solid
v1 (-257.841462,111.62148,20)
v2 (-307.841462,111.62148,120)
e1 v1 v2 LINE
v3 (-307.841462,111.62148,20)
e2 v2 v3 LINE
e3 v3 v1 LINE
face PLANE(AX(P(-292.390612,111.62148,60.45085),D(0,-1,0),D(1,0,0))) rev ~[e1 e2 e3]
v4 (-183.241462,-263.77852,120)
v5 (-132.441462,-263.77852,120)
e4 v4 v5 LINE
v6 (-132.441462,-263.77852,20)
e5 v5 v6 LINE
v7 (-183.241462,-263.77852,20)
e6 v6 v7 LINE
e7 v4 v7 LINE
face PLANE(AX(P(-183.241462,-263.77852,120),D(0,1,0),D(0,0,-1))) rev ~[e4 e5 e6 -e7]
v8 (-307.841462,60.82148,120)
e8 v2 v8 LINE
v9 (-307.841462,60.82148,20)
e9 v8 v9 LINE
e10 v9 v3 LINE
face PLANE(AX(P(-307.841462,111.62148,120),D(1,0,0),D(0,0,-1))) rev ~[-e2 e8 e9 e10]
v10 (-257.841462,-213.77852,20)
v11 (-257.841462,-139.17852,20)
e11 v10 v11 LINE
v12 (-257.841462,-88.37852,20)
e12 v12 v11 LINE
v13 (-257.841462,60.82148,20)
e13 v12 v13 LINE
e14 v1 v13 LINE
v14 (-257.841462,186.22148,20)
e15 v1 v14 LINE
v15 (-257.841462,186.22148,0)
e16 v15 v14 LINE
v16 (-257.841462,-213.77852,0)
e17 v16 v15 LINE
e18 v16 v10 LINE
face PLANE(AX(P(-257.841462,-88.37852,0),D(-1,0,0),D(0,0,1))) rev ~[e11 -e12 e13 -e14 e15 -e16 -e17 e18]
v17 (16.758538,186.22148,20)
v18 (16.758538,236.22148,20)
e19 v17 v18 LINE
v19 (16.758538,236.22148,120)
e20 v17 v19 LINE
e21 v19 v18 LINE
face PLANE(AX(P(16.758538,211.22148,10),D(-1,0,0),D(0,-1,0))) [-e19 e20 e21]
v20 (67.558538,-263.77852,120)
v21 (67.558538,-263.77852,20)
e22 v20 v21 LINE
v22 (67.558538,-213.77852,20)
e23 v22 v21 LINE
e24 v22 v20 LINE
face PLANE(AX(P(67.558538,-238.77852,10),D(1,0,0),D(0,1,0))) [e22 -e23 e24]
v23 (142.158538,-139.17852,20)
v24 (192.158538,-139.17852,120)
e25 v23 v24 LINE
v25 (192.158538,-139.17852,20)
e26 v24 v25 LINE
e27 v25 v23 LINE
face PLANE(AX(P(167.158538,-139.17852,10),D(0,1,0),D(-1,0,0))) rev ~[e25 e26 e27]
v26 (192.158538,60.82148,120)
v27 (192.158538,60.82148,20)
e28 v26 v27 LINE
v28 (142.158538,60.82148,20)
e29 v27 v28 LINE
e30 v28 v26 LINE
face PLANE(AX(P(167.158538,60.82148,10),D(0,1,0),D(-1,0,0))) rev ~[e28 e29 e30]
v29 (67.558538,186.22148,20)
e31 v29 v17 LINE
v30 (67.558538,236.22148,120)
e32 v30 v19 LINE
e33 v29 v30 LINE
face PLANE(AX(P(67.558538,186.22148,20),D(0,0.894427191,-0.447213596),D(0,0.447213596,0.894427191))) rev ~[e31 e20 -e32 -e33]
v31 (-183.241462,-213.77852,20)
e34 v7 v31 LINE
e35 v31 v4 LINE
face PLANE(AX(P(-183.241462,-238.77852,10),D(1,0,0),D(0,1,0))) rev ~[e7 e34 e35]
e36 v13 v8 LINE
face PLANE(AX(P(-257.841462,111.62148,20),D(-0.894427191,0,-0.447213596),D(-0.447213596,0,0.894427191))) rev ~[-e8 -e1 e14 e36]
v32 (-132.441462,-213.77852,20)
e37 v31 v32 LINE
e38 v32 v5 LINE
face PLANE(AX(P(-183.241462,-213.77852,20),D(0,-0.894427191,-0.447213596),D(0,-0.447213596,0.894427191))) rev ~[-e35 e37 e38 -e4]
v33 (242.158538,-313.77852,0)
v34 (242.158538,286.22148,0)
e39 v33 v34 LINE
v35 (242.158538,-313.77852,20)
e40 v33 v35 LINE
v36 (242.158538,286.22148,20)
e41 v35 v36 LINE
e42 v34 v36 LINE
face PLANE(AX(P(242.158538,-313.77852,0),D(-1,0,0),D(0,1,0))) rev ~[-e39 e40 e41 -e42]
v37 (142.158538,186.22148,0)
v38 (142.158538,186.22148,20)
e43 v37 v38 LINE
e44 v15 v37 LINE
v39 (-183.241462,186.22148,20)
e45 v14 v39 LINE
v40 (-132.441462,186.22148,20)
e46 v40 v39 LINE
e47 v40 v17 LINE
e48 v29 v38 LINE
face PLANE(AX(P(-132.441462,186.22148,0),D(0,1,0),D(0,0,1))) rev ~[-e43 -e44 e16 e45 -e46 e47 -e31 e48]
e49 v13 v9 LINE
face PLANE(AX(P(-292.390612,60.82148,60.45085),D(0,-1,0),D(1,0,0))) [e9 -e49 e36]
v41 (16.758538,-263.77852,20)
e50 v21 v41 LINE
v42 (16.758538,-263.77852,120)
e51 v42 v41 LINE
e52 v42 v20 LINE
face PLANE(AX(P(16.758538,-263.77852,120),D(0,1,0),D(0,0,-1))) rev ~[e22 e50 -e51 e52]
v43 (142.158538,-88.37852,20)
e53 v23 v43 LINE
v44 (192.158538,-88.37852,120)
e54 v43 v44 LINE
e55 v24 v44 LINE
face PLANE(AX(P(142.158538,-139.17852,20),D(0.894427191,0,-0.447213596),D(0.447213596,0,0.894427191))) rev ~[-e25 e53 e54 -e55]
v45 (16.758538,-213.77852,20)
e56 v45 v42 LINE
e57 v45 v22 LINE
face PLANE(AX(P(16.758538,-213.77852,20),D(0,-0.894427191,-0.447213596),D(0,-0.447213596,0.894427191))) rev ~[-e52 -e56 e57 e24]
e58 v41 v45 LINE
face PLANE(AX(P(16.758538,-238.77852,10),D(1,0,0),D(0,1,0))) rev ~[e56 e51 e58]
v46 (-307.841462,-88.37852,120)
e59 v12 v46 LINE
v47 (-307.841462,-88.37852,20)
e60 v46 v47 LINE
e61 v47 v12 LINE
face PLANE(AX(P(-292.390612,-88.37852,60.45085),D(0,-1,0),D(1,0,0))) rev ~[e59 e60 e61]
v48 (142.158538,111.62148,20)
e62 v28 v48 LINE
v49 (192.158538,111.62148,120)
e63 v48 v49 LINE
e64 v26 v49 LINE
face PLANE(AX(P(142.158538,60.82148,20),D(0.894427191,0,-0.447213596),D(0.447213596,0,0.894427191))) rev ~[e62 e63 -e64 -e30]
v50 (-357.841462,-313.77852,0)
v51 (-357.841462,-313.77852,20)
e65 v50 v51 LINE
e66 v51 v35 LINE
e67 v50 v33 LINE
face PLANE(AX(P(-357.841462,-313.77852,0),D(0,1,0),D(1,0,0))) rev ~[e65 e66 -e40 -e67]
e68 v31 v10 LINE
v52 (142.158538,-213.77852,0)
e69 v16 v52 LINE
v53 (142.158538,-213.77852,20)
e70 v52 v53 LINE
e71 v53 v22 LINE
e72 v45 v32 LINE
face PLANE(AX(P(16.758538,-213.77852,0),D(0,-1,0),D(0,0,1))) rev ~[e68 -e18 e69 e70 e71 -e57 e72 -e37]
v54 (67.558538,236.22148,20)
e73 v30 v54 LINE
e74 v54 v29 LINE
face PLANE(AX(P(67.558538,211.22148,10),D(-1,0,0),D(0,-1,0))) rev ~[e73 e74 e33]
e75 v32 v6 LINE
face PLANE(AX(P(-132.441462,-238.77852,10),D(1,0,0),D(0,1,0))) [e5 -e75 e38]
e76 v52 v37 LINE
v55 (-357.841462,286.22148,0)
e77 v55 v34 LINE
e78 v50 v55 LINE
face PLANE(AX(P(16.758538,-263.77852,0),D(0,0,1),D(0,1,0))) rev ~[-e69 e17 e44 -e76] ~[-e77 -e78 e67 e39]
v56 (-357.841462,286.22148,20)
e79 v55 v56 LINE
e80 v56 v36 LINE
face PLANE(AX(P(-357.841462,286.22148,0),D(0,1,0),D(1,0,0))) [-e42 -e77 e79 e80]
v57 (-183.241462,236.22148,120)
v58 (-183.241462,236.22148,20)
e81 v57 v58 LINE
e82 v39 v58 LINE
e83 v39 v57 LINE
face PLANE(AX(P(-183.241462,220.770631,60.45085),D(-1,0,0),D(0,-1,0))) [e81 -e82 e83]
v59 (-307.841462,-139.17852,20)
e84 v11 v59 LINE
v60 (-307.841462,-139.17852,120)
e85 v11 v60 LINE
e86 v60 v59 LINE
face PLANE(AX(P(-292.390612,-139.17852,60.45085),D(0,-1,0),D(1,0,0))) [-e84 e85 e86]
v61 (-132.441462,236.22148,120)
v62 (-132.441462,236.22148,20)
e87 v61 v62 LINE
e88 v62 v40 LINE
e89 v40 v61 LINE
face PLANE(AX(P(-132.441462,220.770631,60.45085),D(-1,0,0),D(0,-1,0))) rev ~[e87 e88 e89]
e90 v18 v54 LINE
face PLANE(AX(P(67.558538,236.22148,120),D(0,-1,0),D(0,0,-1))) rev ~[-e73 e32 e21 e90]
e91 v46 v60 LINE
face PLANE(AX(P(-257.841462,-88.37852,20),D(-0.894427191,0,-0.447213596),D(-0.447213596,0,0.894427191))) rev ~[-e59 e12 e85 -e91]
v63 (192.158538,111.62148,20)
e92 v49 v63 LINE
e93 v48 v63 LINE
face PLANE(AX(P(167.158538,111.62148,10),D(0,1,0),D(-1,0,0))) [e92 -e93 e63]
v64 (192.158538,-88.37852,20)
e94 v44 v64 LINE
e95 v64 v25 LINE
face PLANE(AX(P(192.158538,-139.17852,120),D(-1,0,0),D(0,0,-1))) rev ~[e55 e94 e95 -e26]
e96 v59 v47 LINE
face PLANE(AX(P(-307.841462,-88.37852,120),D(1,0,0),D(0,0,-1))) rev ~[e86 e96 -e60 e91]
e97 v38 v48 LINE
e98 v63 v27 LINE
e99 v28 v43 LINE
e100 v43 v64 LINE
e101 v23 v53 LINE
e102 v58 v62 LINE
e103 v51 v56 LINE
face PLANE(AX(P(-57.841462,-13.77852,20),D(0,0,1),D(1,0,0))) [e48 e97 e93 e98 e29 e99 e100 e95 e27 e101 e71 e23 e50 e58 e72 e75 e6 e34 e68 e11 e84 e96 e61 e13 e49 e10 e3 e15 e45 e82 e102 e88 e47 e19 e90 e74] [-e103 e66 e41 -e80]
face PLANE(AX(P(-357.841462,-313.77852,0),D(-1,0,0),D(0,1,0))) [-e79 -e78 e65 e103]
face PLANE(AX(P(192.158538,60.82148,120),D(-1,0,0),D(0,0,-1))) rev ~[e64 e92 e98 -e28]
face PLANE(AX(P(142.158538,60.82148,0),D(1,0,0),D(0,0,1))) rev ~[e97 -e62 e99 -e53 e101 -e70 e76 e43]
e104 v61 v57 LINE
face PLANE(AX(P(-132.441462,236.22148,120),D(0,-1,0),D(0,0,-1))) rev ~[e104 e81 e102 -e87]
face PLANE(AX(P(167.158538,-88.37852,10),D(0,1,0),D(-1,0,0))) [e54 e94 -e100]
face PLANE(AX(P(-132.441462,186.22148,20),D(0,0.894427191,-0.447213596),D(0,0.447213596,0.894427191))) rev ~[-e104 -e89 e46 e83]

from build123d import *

# Parameters (mm, degrees)
F0_W      = 600
F0_H      = 600
F1_DEPTH  = 20
F2_W      = 50
F2_H      = 20
F3_W      = 50
F3_H      = 20
F8_DEPTH  = 50.8
F4_W      = 50
F4_H      = 20
F5_W      = 50
F5_H      = 20
F11_DEPTH = 50.8
F6_W      = 50
F6_H      = 20
F7_W      = 50
F7_H      = 20
F12_DEPTH = 50.8
F9_W      = 50
F9_H      = 20
F10_W     = 50
F10_H     = 20
F13_DEPTH = 50.8


# Not quite as in the source:
# - a feature names something its author has since deleted; it is built from what else it names


with BuildPart() as f1:
    # F0 (on Top) → F1 (new body)
    with BuildSketch(Plane.XY):
        with Locations((-57.8414618969, -13.7785196304)):
            Rectangle(F0_W, F0_H)
        Polygon((-257.8414618969, 111.6214803696), (-257.8414618969, 186.2214803696), (-183.2414618969, 186.2214803696), (-183.2414618969, 236.2214803696), (-157.8414618969, 236.2214803696), (-132.4414618969, 236.2214803696), (-132.4414618969, 186.2214803696), (16.7585381031, 186.2214803696), (16.7585381031, 236.2214803696), (67.5585381031, 236.2214803696), (67.5585381031, 186.2214803696), (142.1585381031, 186.2214803696), (142.1585381031, 111.6214803696), (192.1585381031, 111.6214803696), (192.1585381031, 60.8214803696), (142.1585381031, 60.8214803696), (142.1585381031, -88.3785196304), (192.1585381031, -88.3785196304), (192.1585381031, -139.1785196304), (142.1585381031, -139.1785196304), (142.1585381031, -213.7785196304), (67.5585381031, -213.7785196304), (67.5585381031, -263.7785196304), (16.7585381031, -263.7785196304), (16.7585381031, -213.7785196304), (-132.4414618969, -213.7785196304), (-132.4414618969, -263.7785196304), (-183.2414618969, -263.7785196304), (-183.2414618969, -213.7785196304), (-257.8414618969, -213.7785196304), (-257.8414618969, -139.1785196304), (-307.8414618969, -139.1785196304), (-307.8414618969, -88.3785196304), (-257.8414618969, -88.3785196304), (-257.8414618969, -13.7785196304), (-257.8414618969, 60.8214803696), (-307.8414618969, 60.8214803696), (-307.8414618969, 111.6214803696), align=None, mode=Mode.SUBTRACT)
    extrude(amount=F1_DEPTH)

    # F2 (on face) + F3 (on face) → F8 (join)
    with BuildSketch(Plane.XZ.offset(88.3785196304)):
        Polygon((-307.8414618969, 20), (-257.8414618969, 20), (-307.8414618969, 120), align=None)
        with Locations((-282.8414618969, 10)):
            Rectangle(F2_W, F2_H)
    with BuildSketch(Plane.XZ.offset(-111.6214803696)):
        Polygon((-307.8414618969, 20), (-257.8414618969, 20), (-307.8414618969, 120), align=None)
        with Locations((-282.8414618969, 10)):
            Rectangle(F3_W, F3_H)
    extrude(amount=F8_DEPTH)

    # F4 (on face) + F5 (on face) → F11 (join)
    with BuildSketch(Plane(origin=(-132.4414618969, 0, 0), x_dir=(0, -1, 0), z_dir=(-1, 0, 0))):
        Polygon((-236.2214803696, 20), (-186.2214803696, 20), (-236.2214803696, 120), align=None)
        with Locations((-211.2214803696, 10)):
            Rectangle(F4_W, F4_H)
    with BuildSketch(Plane(origin=(67.5585381031, 0, 0), x_dir=(0, -1, 0), z_dir=(-1, 0, 0))):
        with Locations((-211.2214803696, 10)):
            Rectangle(F5_W, F5_H)
        Polygon((-236.2214803696, 20), (-186.2214803696, 20), (-236.2214803696, 120), align=None)
    extrude(amount=F11_DEPTH)

    # F6 (on face) + F7 (on face) → F12 (join)
    with BuildSketch(Plane(origin=(0, 60.8214803696, 0), x_dir=(-1, 0, 0), z_dir=(0, 1, 0))):
        with Locations((-167.1585381031, 10)):
            Rectangle(F6_W, F6_H)
        Polygon((-192.1585381031, 20), (-142.1585381031, 20), (-192.1585381031, 120), align=None)
    with BuildSketch(Plane(origin=(0, -139.1785196304, 0), x_dir=(-1, 0, 0), z_dir=(0, 1, 0))):
        with Locations((-167.1585381031, 10)):
            Rectangle(F7_W, F7_H)
        Polygon((-192.1585381031, 20), (-142.1585381031, 20), (-192.1585381031, 120), align=None)
    extrude(amount=F12_DEPTH)

    # F9 (on face) + F10 (on face) → F13 (join)
    with BuildSketch(Plane.YZ.offset(16.7585381031)):
        with Locations((-238.7785196304, 10)):
            Rectangle(F9_W, F9_H)
        Polygon((-263.7785196304, 20), (-213.7785196304, 20), (-263.7785196304, 120), align=None)
    with BuildSketch(Plane.YZ.offset(-183.2414618969)):
        with Locations((-238.7785196304, 10)):
            Rectangle(F10_W, F10_H)
        Polygon((-263.7785196304, 20), (-213.7785196304, 20), (-263.7785196304, 120), align=None)
    extrude(amount=F13_DEPTH)


solid = f1.part
